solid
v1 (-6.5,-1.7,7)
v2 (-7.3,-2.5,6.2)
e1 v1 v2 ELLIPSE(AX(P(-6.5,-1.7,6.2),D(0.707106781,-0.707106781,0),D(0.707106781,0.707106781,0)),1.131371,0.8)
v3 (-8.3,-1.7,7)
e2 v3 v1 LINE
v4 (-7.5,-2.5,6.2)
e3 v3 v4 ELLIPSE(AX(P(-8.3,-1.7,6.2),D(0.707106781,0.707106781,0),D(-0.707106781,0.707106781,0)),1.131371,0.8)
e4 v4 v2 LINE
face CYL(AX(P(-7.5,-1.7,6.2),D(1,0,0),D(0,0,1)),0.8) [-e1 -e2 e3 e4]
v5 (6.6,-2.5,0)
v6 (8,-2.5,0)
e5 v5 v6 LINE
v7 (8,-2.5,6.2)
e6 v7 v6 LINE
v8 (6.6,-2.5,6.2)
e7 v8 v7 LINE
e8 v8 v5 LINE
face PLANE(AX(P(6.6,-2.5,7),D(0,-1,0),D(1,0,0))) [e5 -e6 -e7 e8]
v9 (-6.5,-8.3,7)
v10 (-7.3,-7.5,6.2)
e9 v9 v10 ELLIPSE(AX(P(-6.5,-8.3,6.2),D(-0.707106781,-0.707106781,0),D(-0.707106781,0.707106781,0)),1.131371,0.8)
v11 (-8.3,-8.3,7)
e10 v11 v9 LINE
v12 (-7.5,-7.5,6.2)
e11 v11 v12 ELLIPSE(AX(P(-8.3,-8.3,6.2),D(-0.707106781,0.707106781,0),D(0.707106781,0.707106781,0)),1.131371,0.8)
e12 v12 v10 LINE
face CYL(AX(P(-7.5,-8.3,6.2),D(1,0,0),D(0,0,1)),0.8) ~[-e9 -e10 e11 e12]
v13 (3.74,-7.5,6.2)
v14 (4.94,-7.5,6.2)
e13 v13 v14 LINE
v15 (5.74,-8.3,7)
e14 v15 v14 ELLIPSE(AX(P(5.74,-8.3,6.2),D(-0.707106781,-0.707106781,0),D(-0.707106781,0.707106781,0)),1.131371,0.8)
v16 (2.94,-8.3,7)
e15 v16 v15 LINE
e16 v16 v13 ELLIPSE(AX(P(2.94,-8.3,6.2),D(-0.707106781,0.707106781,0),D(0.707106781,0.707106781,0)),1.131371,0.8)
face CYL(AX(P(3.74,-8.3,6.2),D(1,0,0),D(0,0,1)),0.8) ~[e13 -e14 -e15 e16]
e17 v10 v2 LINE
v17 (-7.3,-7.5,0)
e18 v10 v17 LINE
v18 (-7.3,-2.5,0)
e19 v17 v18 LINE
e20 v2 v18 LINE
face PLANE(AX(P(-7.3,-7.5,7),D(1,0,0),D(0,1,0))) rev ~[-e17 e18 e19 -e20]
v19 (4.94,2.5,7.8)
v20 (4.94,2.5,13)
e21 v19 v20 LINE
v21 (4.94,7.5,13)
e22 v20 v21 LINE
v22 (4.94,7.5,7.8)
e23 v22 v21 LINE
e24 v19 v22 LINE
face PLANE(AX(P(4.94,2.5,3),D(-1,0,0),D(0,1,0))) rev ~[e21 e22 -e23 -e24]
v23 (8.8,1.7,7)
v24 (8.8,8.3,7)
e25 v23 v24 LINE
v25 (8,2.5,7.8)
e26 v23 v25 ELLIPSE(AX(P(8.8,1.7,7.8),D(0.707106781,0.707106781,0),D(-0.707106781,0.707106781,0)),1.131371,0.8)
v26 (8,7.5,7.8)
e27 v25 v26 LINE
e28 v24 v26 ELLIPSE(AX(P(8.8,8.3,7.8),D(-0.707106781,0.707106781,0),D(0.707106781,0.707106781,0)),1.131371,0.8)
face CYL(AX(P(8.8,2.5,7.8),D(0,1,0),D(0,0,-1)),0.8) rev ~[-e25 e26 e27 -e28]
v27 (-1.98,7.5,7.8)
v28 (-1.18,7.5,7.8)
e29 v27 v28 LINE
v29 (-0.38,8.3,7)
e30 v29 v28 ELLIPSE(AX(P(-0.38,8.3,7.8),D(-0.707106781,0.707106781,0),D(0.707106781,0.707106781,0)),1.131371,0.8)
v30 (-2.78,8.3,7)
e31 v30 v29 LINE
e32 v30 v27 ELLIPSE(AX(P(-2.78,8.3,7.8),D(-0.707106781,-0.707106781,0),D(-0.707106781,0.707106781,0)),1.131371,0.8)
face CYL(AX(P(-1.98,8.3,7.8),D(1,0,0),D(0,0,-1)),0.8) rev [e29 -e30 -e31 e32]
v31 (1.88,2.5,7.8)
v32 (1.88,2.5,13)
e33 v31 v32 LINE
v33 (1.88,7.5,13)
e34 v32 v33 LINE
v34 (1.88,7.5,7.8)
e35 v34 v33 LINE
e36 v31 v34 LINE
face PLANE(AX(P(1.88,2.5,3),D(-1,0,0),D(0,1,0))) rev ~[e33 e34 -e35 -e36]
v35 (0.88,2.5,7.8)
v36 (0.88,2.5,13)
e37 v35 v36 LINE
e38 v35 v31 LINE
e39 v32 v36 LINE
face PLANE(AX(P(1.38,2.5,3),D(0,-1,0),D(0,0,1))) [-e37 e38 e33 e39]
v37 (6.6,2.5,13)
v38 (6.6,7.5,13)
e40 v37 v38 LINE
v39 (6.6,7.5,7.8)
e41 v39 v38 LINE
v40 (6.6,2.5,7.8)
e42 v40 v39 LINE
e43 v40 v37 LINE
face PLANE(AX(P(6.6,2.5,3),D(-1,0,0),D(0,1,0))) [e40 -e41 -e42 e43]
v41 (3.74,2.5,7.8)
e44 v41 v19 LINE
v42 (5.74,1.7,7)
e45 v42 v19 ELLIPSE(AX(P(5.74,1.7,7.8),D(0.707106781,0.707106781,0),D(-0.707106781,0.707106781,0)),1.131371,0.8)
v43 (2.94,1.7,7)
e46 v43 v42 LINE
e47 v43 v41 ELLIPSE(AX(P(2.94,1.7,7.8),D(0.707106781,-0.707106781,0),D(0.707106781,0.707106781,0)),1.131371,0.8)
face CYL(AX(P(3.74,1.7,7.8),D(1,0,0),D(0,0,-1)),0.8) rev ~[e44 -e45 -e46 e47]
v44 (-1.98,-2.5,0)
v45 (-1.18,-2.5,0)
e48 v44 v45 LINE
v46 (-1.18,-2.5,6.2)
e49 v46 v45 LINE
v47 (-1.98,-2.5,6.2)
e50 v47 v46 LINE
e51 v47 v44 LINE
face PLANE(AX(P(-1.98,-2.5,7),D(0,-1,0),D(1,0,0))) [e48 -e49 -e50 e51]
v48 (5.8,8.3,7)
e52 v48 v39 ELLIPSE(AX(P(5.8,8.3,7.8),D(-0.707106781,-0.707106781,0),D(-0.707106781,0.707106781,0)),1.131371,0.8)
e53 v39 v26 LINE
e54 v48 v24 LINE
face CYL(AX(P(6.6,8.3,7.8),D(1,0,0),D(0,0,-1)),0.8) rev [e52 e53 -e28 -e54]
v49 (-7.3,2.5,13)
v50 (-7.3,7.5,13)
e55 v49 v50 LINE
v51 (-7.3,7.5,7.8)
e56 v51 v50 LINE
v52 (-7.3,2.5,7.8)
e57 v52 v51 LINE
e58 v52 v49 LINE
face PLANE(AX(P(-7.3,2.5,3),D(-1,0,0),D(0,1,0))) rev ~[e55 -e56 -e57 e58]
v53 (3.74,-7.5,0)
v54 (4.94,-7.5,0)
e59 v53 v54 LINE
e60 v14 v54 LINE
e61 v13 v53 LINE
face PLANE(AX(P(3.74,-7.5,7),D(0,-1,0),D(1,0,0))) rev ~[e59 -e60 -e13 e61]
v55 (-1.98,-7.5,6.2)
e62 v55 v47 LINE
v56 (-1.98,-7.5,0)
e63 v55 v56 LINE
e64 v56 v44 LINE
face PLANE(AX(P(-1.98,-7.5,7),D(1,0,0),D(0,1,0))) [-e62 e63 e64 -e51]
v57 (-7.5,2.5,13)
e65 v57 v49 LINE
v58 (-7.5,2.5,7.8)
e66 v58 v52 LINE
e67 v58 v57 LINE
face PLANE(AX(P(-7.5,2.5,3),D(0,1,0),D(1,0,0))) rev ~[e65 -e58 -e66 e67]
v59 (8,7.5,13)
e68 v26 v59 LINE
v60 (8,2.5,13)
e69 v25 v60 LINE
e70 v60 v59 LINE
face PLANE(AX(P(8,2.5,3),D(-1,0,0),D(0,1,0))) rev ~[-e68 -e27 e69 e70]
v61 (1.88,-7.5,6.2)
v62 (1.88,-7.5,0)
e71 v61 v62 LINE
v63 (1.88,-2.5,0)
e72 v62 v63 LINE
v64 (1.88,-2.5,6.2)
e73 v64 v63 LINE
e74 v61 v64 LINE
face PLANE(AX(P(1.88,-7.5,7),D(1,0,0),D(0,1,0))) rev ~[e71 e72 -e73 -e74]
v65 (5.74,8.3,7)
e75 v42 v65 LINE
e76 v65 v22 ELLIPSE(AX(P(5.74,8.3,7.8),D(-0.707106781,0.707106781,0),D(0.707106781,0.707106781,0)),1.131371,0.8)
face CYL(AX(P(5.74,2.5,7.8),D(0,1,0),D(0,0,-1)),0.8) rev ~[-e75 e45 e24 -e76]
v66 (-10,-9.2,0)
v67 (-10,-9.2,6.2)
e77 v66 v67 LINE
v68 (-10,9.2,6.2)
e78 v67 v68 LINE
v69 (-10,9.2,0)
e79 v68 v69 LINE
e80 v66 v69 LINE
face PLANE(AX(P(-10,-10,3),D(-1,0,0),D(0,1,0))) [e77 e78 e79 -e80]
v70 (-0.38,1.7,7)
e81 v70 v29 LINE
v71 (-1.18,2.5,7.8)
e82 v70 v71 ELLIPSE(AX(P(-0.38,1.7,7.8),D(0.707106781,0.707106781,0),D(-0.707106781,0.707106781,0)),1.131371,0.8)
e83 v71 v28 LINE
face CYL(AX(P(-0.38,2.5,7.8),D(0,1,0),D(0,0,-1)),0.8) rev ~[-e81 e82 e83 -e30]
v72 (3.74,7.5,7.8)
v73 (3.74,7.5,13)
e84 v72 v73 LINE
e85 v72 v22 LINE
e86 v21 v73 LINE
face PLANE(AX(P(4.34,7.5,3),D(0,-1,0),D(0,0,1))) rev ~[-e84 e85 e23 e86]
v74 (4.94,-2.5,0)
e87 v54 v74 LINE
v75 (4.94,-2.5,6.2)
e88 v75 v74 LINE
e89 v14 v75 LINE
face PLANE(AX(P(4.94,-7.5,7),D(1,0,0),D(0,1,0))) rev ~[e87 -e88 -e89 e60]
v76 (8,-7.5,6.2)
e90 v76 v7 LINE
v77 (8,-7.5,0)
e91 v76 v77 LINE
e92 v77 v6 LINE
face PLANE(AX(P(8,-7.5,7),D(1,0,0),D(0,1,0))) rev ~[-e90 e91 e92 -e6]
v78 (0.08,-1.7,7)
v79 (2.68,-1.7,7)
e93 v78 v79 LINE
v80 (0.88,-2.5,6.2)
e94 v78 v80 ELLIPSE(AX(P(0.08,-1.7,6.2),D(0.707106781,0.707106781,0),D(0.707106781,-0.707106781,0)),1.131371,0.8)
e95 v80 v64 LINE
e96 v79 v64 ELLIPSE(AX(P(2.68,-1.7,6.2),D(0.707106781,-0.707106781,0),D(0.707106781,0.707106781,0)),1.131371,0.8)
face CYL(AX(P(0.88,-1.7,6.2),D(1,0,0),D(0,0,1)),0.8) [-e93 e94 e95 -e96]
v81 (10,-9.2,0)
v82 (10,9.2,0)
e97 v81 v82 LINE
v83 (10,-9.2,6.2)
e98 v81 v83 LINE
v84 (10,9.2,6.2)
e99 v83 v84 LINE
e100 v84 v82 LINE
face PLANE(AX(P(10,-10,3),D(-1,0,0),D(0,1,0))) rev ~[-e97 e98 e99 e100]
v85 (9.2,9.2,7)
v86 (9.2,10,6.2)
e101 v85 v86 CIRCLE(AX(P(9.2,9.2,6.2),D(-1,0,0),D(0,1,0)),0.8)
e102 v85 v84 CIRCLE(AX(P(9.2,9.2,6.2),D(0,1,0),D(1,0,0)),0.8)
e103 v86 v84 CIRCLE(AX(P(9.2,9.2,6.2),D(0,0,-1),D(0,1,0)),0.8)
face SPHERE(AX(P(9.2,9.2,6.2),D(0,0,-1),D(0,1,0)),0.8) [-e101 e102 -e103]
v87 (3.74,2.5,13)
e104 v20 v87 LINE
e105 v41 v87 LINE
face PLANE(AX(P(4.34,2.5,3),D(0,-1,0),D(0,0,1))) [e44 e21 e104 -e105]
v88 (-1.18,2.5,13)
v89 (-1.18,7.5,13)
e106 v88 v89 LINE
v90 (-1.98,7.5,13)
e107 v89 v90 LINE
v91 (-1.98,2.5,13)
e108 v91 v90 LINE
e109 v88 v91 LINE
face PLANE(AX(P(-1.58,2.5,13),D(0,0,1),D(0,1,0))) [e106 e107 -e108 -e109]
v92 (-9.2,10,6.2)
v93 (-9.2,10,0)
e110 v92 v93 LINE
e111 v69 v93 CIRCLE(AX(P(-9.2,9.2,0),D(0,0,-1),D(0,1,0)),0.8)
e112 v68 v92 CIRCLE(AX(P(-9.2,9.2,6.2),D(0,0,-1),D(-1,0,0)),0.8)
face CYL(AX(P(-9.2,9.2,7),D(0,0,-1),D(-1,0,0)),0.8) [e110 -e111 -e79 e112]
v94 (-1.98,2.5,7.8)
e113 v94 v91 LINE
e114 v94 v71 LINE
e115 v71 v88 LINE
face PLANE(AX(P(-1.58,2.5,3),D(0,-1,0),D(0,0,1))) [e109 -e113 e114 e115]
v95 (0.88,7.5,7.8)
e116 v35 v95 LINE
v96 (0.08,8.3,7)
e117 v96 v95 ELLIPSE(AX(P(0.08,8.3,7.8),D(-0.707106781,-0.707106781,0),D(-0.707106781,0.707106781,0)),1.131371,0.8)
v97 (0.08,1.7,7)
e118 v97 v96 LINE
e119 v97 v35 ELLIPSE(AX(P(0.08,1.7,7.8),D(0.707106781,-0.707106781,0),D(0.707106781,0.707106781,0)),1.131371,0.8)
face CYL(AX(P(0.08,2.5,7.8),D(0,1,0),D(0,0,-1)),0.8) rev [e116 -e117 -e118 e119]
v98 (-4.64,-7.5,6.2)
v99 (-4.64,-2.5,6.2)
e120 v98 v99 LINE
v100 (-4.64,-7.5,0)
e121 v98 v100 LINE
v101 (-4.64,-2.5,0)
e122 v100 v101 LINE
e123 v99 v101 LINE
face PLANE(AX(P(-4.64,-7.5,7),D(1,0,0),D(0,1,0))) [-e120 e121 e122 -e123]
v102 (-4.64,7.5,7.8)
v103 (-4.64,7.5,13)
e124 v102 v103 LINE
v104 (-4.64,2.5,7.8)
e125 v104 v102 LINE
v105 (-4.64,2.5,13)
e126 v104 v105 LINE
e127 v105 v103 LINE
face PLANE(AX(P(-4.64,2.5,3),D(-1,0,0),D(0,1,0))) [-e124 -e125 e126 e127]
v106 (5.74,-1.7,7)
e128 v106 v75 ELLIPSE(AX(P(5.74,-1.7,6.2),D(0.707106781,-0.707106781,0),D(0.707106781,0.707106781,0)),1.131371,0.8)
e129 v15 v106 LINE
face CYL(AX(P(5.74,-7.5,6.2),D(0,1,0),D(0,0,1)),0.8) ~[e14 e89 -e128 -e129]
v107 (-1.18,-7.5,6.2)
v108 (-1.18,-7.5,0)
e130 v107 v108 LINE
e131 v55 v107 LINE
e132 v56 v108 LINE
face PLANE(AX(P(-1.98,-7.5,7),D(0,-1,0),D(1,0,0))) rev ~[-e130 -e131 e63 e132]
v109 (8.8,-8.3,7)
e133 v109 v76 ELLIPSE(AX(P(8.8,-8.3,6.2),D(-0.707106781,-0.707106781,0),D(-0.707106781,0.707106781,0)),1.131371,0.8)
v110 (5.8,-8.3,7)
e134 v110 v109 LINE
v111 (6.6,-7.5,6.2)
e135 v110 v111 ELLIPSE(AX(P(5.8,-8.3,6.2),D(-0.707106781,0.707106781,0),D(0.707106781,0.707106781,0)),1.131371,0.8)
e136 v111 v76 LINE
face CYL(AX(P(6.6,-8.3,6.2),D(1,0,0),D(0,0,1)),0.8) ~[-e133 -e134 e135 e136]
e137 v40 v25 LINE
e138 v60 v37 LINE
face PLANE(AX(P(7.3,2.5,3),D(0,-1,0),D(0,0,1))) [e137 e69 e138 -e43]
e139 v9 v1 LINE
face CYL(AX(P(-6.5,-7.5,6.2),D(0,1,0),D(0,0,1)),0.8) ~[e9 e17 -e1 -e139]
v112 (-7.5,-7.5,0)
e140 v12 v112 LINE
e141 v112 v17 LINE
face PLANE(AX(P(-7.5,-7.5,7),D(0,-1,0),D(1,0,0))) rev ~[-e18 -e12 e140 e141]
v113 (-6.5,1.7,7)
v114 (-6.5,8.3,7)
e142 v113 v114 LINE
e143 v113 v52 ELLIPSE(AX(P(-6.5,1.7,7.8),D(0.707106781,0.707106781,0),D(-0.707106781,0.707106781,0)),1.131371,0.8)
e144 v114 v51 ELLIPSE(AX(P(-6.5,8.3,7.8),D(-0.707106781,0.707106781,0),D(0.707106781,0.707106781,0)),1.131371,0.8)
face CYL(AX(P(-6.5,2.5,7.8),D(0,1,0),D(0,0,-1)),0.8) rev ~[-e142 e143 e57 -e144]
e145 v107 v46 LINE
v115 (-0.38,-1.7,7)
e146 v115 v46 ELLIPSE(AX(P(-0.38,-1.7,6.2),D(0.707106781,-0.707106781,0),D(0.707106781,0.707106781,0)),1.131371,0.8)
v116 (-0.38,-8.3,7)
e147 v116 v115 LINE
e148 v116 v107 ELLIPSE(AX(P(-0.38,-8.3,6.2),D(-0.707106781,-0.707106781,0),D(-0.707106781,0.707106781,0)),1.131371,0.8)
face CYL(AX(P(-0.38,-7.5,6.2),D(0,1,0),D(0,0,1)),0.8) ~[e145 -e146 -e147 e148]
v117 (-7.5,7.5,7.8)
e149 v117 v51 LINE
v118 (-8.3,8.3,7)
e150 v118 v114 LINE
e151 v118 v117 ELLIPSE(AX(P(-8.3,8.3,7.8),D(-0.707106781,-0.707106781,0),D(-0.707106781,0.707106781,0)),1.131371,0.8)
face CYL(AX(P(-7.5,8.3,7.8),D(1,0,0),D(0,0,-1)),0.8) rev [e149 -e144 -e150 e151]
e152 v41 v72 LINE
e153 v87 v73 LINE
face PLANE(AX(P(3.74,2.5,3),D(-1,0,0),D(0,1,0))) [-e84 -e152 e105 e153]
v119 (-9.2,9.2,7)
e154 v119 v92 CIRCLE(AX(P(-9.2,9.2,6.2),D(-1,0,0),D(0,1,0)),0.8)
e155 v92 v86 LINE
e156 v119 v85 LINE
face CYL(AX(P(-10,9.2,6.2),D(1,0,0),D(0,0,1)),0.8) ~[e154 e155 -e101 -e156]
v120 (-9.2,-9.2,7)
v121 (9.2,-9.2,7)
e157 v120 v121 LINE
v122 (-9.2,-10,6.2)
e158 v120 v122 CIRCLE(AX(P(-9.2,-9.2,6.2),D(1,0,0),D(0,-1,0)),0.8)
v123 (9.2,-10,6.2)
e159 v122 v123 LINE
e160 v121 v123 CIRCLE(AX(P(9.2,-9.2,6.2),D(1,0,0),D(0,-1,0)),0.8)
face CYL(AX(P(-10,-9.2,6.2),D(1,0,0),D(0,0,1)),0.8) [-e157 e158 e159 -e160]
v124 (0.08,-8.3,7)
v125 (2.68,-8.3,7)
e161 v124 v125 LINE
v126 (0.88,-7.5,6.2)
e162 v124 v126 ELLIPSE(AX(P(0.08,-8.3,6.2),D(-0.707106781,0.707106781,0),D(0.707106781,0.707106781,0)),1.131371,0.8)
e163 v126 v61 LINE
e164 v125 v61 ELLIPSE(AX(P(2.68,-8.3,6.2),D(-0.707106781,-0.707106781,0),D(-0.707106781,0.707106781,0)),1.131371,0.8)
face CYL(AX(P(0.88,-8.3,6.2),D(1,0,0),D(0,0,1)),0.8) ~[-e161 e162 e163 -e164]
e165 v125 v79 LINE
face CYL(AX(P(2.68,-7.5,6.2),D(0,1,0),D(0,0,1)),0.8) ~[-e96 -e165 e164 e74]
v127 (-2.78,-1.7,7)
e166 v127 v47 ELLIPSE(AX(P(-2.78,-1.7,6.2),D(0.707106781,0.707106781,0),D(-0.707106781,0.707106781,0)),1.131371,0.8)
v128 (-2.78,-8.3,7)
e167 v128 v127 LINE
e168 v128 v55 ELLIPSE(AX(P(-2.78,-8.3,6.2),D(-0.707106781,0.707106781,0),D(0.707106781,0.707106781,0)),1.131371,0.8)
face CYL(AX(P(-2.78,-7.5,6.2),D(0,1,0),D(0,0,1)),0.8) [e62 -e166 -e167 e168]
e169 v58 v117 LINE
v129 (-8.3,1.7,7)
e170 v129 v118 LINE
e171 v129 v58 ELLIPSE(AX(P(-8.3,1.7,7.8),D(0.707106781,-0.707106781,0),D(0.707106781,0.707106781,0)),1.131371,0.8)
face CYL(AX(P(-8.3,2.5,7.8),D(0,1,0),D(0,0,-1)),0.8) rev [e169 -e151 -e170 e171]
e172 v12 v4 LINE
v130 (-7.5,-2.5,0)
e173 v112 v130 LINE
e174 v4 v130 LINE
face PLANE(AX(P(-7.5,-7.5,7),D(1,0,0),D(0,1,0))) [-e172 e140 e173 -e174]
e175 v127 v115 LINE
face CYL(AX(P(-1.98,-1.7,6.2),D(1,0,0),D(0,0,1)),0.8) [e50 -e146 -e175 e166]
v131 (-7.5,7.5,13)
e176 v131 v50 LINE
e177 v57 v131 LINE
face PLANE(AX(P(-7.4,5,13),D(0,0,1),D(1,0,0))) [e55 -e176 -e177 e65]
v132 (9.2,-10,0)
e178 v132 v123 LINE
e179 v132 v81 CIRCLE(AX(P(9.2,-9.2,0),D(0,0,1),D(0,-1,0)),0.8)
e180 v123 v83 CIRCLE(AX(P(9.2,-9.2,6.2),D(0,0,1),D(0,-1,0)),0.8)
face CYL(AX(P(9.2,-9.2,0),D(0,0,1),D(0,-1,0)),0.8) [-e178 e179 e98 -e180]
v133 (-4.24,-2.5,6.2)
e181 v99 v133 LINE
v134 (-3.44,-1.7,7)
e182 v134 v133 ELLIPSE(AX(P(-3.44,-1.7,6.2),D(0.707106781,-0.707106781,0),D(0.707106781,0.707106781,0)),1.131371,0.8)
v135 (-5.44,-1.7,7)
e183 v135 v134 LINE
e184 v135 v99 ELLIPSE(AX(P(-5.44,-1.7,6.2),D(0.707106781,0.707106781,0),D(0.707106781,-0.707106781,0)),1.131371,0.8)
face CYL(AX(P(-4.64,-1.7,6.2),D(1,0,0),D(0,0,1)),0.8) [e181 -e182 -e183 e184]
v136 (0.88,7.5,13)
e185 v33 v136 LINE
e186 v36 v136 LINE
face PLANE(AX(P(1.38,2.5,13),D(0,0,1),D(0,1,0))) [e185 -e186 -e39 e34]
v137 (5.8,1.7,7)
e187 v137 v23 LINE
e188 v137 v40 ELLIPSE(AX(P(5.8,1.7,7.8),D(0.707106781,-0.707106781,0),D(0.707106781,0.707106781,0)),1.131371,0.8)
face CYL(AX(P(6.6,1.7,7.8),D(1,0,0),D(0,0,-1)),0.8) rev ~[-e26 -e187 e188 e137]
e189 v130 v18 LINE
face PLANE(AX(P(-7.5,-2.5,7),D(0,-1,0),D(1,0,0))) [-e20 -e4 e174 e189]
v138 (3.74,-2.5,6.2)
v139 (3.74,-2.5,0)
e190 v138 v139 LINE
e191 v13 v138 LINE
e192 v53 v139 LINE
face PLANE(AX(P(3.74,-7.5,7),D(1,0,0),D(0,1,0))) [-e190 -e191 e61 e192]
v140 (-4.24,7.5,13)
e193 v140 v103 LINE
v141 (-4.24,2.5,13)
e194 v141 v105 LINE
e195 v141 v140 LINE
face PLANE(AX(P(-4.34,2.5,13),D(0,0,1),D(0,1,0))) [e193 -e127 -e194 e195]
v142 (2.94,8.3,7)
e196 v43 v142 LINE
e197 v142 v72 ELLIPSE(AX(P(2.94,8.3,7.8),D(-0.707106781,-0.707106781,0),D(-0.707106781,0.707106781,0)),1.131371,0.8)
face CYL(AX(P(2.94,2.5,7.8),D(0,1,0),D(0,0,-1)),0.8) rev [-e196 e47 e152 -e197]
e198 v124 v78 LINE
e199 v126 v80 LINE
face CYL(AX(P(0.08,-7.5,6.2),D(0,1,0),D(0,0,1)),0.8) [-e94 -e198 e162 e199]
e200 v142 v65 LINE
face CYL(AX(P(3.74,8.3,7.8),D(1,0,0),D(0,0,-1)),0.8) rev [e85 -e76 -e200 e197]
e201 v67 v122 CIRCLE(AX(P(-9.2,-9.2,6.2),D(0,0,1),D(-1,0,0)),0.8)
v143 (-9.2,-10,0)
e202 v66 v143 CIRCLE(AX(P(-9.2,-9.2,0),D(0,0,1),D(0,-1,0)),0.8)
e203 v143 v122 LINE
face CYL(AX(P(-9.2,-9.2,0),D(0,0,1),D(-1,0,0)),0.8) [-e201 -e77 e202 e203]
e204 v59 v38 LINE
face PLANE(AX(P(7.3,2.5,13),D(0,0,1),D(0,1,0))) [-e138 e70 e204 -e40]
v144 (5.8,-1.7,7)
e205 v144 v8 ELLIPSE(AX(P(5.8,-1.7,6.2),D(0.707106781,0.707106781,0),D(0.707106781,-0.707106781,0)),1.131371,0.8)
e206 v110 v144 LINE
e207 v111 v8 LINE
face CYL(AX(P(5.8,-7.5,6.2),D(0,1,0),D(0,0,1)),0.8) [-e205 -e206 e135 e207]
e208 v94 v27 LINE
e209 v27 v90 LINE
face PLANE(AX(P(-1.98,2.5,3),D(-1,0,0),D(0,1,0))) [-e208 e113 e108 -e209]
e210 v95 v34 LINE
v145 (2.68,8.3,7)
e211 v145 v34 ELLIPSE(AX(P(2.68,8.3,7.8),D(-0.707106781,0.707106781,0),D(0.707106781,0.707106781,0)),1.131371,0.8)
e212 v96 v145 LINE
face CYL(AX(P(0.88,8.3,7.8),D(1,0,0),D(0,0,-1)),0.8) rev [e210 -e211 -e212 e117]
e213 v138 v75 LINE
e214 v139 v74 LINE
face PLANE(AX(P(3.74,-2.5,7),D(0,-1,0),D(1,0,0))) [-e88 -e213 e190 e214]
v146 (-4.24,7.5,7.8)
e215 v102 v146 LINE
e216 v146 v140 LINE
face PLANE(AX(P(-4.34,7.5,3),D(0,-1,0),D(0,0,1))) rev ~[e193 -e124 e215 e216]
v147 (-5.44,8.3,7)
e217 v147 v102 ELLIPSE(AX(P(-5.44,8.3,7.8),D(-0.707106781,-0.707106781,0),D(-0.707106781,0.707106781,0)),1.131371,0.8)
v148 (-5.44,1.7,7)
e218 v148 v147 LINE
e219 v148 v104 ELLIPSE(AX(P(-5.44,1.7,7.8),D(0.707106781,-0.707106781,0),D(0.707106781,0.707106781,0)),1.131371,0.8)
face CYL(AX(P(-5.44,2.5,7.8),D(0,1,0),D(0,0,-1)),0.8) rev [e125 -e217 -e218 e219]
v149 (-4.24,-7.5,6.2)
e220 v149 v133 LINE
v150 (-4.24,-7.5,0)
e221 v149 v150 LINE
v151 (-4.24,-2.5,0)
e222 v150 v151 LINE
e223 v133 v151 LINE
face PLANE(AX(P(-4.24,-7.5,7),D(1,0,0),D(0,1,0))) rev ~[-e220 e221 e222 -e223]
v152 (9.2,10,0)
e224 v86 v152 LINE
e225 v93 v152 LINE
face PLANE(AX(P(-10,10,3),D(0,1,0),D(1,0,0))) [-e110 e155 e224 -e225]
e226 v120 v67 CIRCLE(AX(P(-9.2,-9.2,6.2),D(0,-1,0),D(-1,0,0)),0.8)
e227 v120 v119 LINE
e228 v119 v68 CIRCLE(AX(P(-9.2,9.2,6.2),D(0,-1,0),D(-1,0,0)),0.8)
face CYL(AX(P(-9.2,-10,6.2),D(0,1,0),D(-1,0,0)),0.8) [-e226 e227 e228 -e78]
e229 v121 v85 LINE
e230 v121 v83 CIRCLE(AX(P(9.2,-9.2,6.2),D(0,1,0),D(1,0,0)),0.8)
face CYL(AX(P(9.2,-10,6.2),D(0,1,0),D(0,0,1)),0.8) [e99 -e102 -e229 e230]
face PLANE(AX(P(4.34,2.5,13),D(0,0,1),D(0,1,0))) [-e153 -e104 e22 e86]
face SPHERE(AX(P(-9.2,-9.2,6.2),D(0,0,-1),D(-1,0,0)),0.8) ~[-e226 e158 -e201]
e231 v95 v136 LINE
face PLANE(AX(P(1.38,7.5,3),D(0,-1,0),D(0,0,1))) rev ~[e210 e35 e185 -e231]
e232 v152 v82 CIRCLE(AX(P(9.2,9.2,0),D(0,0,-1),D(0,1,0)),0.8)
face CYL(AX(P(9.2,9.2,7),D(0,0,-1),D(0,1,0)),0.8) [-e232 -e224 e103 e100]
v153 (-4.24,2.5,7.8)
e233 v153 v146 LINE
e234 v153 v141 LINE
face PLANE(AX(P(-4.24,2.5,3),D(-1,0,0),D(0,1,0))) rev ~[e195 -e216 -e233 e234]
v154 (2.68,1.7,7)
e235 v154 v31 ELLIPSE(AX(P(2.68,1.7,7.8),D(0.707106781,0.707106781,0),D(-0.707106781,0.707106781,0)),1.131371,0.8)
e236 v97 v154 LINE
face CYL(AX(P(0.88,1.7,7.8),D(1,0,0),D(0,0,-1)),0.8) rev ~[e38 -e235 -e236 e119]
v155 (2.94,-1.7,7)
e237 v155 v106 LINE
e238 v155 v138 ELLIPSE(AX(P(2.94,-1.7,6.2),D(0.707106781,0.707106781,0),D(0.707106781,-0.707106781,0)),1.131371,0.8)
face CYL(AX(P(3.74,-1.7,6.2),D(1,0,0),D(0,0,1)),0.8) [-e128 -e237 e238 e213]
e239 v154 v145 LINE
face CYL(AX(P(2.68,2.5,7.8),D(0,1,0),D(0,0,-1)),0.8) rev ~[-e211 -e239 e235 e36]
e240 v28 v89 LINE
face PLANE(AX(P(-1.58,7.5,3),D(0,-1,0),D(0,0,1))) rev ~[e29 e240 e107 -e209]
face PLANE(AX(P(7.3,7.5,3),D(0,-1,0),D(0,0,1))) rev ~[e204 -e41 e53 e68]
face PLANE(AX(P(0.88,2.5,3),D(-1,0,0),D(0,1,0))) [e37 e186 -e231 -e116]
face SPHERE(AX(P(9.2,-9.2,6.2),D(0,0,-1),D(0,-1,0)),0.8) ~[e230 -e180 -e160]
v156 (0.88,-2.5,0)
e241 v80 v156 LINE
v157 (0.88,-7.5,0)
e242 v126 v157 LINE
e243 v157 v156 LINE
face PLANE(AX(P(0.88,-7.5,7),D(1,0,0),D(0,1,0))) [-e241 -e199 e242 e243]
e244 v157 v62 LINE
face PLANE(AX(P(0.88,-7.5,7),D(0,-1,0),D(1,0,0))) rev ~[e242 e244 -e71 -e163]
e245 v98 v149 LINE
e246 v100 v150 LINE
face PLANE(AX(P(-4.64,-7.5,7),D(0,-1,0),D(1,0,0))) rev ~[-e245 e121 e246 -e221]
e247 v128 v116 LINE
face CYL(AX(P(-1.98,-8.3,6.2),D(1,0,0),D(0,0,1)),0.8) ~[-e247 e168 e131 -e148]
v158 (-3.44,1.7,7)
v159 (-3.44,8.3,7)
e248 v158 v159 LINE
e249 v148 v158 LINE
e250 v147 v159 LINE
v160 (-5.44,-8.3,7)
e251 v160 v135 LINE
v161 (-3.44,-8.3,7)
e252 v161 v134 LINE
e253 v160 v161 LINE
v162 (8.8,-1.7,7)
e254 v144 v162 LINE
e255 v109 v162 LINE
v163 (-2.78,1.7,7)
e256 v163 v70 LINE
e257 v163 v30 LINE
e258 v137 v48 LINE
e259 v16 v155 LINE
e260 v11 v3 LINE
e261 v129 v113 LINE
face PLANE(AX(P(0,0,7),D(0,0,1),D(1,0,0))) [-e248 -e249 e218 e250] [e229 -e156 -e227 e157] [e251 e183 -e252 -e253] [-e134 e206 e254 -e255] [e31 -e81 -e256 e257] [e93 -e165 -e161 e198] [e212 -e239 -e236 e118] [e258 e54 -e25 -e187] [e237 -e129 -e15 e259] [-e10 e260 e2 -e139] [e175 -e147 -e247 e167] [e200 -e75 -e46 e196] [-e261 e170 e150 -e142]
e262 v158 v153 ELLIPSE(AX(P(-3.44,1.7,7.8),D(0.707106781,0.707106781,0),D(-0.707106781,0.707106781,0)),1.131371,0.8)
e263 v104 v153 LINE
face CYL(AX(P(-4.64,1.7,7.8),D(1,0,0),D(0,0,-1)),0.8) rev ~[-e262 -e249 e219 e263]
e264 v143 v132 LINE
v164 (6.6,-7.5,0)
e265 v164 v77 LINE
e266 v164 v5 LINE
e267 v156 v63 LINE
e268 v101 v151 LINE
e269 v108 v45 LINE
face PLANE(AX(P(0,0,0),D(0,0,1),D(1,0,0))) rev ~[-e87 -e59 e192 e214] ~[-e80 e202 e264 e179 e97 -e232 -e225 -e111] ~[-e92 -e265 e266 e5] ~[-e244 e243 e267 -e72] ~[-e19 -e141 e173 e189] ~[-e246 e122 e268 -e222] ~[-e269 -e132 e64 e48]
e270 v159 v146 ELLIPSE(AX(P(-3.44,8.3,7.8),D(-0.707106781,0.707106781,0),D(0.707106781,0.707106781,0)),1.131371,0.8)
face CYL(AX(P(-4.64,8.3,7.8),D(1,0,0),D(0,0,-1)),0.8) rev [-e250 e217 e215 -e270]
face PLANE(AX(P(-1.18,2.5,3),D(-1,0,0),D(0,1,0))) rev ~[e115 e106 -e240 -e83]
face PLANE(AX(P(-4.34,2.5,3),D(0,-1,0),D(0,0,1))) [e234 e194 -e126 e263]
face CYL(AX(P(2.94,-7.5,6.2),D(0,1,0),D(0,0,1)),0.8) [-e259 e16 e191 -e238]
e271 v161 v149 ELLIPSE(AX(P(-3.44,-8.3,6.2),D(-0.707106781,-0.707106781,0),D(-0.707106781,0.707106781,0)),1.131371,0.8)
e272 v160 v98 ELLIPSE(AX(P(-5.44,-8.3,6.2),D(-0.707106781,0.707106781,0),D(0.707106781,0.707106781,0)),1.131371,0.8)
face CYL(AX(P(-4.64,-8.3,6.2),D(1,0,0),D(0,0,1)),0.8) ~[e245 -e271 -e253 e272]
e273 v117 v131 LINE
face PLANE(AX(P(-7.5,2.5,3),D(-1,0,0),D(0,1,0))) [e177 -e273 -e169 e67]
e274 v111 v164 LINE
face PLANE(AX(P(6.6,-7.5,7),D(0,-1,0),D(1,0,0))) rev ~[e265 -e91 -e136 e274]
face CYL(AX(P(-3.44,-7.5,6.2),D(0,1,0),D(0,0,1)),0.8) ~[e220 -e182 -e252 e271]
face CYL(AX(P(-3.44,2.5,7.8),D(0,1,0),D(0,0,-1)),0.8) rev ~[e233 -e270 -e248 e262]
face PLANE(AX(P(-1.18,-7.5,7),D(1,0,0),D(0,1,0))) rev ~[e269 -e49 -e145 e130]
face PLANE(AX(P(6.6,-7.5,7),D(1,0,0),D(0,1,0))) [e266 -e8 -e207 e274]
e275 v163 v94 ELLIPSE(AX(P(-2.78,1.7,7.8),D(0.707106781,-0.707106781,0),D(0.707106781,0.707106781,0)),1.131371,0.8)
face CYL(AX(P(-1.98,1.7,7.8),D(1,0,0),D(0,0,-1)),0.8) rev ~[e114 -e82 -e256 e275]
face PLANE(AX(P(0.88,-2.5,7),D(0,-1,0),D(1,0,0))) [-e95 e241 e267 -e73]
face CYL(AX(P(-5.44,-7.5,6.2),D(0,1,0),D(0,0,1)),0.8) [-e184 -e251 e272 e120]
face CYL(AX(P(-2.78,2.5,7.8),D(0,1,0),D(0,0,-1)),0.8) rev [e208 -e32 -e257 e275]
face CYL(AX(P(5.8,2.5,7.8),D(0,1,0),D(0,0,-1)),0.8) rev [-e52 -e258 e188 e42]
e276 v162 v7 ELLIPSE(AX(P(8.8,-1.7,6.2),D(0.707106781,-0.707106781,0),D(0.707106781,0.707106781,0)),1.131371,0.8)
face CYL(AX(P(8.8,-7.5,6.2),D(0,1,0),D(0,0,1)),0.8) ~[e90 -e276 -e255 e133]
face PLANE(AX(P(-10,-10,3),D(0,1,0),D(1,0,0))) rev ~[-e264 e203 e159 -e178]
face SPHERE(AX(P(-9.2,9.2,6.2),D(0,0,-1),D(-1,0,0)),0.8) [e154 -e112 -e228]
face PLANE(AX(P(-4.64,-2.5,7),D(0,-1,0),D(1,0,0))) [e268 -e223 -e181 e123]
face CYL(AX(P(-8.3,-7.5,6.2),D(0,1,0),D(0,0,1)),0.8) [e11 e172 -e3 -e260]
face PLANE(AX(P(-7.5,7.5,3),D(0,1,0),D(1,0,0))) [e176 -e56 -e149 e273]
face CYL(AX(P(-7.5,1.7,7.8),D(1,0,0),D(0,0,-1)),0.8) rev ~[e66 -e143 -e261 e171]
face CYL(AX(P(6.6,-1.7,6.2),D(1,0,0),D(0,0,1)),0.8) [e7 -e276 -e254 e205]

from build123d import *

# Parameters (mm, degrees)
F0_W      = 20
F0_H      = 20
F1_DEPTH  = 3
F2_W      = 0.2
F2_H      = 5
F3_DEPTH  = 10
F4_DEPTH  = 0.1
F5_DEPTH  = 0.4
F6_DEPTH  = 0.5
F7_DEPTH  = 0.6
F8_DEPTH  = 0.7
F9_DEPTH  = 4
F10_W     = 0.2
F10_H     = 5
F10_W_2   = 0.4
F10_W_3   = 0.8
F10_W_4   = 1
F10_W_5   = 1.2
F10_W_6   = 1.4
F11_DEPTH = 7
F12_R     = 0.8


with BuildPart() as f1:
    # F0 (on Top) → F1 (new body)
    with BuildSketch(Plane.XY):
        Rectangle(F0_W, F0_H)
    extrude(amount=F1_DEPTH)

    # F2 (on face) → F3 (join)
    with BuildSketch(Plane.XY.offset(3)):
        with Locations((-7.4, 5)):
            Rectangle(F2_W, F2_H)
        with Locations((-4.44, 5)):
            Rectangle(F2_W, F2_H)
        with Locations((-1.48, 5)):
            Rectangle(F2_W, F2_H)
        with Locations((1.48, 5)):
            Rectangle(F2_W, F2_H)
        with Locations((4.44, 5)):
            Rectangle(F2_W, F2_H)
        with Locations((7.4, 5)):
            Rectangle(F2_W, F2_H)
    extrude(amount=F3_DEPTH)

    # F4 (add, symmetric): faces of the model
    f4_faces = [f1.faces().sort_by_distance(p)[0] for p in [
        (-4.54, 5, 8),
        (-4.34, 5, 8),
    ]]
    extrude(f4_faces, amount=F4_DEPTH, both=True, dir=(-1, 0, 0))

    # F5 (add, symmetric): a face of the model
    f5_faces = [f1.faces().sort_by_distance(p)[0] for p in [
        (-1.58, 5, 8),
    ]]
    extrude(f5_faces, amount=F5_DEPTH, both=True)

    # F6 (add, symmetric): a face of the model
    f6_faces = [f1.faces().sort_by_distance(p)[0] for p in [
        (1.38, 5, 8),
    ]]
    extrude(f6_faces, amount=F6_DEPTH, both=True)

    # F7 (add, symmetric): a face of the model
    f7_faces = [f1.faces().sort_by_distance(p)[0] for p in [
        (4.34, 5, 8),
    ]]
    extrude(f7_faces, amount=F7_DEPTH, both=True)

    # F8 (add, symmetric): a face of the model
    f8_faces = [f1.faces().sort_by_distance(p)[0] for p in [
        (7.3, 5, 8),
    ]]
    extrude(f8_faces, amount=F8_DEPTH, both=True)

    # F9 (add): a face of the model
    f9_faces = [f1.faces().sort_by_distance(p)[0] for p in [
        (-0.16384, -0.3333333333, 3),
    ]]
    extrude(f9_faces, amount=F9_DEPTH)

    # F10 (on face) → F11 (cut, through all)
    with BuildSketch(Plane.XY.offset(7)):
        with Locations((-7.4, -5)):
            Rectangle(F10_W, F10_H)
        with Locations((-4.44, -5)):
            Rectangle(F10_W_2, F10_H)
        with Locations((-1.58, -5)):
            Rectangle(F10_W_3, F10_H)
        with Locations((1.38, -5)):
            Rectangle(F10_W_4, F10_H)
        with Locations((4.34, -5)):
            Rectangle(F10_W_5, F10_H)
        with Locations((7.3, -5)):
            Rectangle(F10_W_6, F10_H)
    extrude(amount=-F11_DEPTH, mode=Mode.SUBTRACT)

    # F12
    f12_edges = [f1.edges().sort_by_distance(p)[0] for p in [
        (10, -10, 3.5),
        (-10, -10, 3.5),
        (-10, 10, 3.5),
        (10, 10, 3.5),
        (-10, 0, 7),
        (0, 10, 7),
        (0, -10, 7),
        (10, 0, 7),
        (-7.5, 5, 7),
        (-7.3, 5, 7),
        (-4.64, 5, 7),
        (-4.24, 5, 7),
        (-1.98, 5, 7),
        (-1.18, 5, 7),
        (0.88, 5, 7),
        (1.88, 5, 7),
        (3.74, 5, 7),
        (6.6, 5, 7),
        (4.94, 5, 7),
        (8, 5, 7),
        (-7.4, 7.5, 7),
        (-7.4, 2.5, 7),
        (-4.44, 2.5, 7),
        (-1.58, 2.5, 7),
        (1.38, 2.5, 7),
        (4.34, 2.5, 7),
        (7.3, 2.5, 7),
        (7.3, -2.5, 7),
        (8, -5, 7),
        (6.6, -5, 7),
        (7.3, -7.5, 7),
        (4.94, -5, 7),
        (4.34, -2.5, 7),
        (4.34, -7.5, 7),
        (3.74, -5, 7),
        (1.88, -5, 7),
        (1.38, -2.5, 7),
        (1.38, -7.5, 7),
        (0.88, -5, 7),
        (-1.18, -5, 7),
        (-1.98, -5, 7),
        (-1.58, -2.5, 7),
        (-1.58, -7.5, 7),
        (-4.24, -5, 7),
        (-4.44, -2.5, 7),
        (-4.64, -5, 7),
        (-4.44, -7.5, 7),
        (-7.3, -5, 7),
        (-7.5, -5, 7),
        (-7.4, -2.5, 7),
        (-7.4, -7.5, 7),
        (-4.44, 7.5, 7),
        (-1.58, 7.5, 7),
        (1.38, 7.5, 7),
        (4.34, 7.5, 7),
        (7.3, 7.5, 7),
    ]]
    fillet(f12_edges, radius=F12_R)


solid = f1.part
